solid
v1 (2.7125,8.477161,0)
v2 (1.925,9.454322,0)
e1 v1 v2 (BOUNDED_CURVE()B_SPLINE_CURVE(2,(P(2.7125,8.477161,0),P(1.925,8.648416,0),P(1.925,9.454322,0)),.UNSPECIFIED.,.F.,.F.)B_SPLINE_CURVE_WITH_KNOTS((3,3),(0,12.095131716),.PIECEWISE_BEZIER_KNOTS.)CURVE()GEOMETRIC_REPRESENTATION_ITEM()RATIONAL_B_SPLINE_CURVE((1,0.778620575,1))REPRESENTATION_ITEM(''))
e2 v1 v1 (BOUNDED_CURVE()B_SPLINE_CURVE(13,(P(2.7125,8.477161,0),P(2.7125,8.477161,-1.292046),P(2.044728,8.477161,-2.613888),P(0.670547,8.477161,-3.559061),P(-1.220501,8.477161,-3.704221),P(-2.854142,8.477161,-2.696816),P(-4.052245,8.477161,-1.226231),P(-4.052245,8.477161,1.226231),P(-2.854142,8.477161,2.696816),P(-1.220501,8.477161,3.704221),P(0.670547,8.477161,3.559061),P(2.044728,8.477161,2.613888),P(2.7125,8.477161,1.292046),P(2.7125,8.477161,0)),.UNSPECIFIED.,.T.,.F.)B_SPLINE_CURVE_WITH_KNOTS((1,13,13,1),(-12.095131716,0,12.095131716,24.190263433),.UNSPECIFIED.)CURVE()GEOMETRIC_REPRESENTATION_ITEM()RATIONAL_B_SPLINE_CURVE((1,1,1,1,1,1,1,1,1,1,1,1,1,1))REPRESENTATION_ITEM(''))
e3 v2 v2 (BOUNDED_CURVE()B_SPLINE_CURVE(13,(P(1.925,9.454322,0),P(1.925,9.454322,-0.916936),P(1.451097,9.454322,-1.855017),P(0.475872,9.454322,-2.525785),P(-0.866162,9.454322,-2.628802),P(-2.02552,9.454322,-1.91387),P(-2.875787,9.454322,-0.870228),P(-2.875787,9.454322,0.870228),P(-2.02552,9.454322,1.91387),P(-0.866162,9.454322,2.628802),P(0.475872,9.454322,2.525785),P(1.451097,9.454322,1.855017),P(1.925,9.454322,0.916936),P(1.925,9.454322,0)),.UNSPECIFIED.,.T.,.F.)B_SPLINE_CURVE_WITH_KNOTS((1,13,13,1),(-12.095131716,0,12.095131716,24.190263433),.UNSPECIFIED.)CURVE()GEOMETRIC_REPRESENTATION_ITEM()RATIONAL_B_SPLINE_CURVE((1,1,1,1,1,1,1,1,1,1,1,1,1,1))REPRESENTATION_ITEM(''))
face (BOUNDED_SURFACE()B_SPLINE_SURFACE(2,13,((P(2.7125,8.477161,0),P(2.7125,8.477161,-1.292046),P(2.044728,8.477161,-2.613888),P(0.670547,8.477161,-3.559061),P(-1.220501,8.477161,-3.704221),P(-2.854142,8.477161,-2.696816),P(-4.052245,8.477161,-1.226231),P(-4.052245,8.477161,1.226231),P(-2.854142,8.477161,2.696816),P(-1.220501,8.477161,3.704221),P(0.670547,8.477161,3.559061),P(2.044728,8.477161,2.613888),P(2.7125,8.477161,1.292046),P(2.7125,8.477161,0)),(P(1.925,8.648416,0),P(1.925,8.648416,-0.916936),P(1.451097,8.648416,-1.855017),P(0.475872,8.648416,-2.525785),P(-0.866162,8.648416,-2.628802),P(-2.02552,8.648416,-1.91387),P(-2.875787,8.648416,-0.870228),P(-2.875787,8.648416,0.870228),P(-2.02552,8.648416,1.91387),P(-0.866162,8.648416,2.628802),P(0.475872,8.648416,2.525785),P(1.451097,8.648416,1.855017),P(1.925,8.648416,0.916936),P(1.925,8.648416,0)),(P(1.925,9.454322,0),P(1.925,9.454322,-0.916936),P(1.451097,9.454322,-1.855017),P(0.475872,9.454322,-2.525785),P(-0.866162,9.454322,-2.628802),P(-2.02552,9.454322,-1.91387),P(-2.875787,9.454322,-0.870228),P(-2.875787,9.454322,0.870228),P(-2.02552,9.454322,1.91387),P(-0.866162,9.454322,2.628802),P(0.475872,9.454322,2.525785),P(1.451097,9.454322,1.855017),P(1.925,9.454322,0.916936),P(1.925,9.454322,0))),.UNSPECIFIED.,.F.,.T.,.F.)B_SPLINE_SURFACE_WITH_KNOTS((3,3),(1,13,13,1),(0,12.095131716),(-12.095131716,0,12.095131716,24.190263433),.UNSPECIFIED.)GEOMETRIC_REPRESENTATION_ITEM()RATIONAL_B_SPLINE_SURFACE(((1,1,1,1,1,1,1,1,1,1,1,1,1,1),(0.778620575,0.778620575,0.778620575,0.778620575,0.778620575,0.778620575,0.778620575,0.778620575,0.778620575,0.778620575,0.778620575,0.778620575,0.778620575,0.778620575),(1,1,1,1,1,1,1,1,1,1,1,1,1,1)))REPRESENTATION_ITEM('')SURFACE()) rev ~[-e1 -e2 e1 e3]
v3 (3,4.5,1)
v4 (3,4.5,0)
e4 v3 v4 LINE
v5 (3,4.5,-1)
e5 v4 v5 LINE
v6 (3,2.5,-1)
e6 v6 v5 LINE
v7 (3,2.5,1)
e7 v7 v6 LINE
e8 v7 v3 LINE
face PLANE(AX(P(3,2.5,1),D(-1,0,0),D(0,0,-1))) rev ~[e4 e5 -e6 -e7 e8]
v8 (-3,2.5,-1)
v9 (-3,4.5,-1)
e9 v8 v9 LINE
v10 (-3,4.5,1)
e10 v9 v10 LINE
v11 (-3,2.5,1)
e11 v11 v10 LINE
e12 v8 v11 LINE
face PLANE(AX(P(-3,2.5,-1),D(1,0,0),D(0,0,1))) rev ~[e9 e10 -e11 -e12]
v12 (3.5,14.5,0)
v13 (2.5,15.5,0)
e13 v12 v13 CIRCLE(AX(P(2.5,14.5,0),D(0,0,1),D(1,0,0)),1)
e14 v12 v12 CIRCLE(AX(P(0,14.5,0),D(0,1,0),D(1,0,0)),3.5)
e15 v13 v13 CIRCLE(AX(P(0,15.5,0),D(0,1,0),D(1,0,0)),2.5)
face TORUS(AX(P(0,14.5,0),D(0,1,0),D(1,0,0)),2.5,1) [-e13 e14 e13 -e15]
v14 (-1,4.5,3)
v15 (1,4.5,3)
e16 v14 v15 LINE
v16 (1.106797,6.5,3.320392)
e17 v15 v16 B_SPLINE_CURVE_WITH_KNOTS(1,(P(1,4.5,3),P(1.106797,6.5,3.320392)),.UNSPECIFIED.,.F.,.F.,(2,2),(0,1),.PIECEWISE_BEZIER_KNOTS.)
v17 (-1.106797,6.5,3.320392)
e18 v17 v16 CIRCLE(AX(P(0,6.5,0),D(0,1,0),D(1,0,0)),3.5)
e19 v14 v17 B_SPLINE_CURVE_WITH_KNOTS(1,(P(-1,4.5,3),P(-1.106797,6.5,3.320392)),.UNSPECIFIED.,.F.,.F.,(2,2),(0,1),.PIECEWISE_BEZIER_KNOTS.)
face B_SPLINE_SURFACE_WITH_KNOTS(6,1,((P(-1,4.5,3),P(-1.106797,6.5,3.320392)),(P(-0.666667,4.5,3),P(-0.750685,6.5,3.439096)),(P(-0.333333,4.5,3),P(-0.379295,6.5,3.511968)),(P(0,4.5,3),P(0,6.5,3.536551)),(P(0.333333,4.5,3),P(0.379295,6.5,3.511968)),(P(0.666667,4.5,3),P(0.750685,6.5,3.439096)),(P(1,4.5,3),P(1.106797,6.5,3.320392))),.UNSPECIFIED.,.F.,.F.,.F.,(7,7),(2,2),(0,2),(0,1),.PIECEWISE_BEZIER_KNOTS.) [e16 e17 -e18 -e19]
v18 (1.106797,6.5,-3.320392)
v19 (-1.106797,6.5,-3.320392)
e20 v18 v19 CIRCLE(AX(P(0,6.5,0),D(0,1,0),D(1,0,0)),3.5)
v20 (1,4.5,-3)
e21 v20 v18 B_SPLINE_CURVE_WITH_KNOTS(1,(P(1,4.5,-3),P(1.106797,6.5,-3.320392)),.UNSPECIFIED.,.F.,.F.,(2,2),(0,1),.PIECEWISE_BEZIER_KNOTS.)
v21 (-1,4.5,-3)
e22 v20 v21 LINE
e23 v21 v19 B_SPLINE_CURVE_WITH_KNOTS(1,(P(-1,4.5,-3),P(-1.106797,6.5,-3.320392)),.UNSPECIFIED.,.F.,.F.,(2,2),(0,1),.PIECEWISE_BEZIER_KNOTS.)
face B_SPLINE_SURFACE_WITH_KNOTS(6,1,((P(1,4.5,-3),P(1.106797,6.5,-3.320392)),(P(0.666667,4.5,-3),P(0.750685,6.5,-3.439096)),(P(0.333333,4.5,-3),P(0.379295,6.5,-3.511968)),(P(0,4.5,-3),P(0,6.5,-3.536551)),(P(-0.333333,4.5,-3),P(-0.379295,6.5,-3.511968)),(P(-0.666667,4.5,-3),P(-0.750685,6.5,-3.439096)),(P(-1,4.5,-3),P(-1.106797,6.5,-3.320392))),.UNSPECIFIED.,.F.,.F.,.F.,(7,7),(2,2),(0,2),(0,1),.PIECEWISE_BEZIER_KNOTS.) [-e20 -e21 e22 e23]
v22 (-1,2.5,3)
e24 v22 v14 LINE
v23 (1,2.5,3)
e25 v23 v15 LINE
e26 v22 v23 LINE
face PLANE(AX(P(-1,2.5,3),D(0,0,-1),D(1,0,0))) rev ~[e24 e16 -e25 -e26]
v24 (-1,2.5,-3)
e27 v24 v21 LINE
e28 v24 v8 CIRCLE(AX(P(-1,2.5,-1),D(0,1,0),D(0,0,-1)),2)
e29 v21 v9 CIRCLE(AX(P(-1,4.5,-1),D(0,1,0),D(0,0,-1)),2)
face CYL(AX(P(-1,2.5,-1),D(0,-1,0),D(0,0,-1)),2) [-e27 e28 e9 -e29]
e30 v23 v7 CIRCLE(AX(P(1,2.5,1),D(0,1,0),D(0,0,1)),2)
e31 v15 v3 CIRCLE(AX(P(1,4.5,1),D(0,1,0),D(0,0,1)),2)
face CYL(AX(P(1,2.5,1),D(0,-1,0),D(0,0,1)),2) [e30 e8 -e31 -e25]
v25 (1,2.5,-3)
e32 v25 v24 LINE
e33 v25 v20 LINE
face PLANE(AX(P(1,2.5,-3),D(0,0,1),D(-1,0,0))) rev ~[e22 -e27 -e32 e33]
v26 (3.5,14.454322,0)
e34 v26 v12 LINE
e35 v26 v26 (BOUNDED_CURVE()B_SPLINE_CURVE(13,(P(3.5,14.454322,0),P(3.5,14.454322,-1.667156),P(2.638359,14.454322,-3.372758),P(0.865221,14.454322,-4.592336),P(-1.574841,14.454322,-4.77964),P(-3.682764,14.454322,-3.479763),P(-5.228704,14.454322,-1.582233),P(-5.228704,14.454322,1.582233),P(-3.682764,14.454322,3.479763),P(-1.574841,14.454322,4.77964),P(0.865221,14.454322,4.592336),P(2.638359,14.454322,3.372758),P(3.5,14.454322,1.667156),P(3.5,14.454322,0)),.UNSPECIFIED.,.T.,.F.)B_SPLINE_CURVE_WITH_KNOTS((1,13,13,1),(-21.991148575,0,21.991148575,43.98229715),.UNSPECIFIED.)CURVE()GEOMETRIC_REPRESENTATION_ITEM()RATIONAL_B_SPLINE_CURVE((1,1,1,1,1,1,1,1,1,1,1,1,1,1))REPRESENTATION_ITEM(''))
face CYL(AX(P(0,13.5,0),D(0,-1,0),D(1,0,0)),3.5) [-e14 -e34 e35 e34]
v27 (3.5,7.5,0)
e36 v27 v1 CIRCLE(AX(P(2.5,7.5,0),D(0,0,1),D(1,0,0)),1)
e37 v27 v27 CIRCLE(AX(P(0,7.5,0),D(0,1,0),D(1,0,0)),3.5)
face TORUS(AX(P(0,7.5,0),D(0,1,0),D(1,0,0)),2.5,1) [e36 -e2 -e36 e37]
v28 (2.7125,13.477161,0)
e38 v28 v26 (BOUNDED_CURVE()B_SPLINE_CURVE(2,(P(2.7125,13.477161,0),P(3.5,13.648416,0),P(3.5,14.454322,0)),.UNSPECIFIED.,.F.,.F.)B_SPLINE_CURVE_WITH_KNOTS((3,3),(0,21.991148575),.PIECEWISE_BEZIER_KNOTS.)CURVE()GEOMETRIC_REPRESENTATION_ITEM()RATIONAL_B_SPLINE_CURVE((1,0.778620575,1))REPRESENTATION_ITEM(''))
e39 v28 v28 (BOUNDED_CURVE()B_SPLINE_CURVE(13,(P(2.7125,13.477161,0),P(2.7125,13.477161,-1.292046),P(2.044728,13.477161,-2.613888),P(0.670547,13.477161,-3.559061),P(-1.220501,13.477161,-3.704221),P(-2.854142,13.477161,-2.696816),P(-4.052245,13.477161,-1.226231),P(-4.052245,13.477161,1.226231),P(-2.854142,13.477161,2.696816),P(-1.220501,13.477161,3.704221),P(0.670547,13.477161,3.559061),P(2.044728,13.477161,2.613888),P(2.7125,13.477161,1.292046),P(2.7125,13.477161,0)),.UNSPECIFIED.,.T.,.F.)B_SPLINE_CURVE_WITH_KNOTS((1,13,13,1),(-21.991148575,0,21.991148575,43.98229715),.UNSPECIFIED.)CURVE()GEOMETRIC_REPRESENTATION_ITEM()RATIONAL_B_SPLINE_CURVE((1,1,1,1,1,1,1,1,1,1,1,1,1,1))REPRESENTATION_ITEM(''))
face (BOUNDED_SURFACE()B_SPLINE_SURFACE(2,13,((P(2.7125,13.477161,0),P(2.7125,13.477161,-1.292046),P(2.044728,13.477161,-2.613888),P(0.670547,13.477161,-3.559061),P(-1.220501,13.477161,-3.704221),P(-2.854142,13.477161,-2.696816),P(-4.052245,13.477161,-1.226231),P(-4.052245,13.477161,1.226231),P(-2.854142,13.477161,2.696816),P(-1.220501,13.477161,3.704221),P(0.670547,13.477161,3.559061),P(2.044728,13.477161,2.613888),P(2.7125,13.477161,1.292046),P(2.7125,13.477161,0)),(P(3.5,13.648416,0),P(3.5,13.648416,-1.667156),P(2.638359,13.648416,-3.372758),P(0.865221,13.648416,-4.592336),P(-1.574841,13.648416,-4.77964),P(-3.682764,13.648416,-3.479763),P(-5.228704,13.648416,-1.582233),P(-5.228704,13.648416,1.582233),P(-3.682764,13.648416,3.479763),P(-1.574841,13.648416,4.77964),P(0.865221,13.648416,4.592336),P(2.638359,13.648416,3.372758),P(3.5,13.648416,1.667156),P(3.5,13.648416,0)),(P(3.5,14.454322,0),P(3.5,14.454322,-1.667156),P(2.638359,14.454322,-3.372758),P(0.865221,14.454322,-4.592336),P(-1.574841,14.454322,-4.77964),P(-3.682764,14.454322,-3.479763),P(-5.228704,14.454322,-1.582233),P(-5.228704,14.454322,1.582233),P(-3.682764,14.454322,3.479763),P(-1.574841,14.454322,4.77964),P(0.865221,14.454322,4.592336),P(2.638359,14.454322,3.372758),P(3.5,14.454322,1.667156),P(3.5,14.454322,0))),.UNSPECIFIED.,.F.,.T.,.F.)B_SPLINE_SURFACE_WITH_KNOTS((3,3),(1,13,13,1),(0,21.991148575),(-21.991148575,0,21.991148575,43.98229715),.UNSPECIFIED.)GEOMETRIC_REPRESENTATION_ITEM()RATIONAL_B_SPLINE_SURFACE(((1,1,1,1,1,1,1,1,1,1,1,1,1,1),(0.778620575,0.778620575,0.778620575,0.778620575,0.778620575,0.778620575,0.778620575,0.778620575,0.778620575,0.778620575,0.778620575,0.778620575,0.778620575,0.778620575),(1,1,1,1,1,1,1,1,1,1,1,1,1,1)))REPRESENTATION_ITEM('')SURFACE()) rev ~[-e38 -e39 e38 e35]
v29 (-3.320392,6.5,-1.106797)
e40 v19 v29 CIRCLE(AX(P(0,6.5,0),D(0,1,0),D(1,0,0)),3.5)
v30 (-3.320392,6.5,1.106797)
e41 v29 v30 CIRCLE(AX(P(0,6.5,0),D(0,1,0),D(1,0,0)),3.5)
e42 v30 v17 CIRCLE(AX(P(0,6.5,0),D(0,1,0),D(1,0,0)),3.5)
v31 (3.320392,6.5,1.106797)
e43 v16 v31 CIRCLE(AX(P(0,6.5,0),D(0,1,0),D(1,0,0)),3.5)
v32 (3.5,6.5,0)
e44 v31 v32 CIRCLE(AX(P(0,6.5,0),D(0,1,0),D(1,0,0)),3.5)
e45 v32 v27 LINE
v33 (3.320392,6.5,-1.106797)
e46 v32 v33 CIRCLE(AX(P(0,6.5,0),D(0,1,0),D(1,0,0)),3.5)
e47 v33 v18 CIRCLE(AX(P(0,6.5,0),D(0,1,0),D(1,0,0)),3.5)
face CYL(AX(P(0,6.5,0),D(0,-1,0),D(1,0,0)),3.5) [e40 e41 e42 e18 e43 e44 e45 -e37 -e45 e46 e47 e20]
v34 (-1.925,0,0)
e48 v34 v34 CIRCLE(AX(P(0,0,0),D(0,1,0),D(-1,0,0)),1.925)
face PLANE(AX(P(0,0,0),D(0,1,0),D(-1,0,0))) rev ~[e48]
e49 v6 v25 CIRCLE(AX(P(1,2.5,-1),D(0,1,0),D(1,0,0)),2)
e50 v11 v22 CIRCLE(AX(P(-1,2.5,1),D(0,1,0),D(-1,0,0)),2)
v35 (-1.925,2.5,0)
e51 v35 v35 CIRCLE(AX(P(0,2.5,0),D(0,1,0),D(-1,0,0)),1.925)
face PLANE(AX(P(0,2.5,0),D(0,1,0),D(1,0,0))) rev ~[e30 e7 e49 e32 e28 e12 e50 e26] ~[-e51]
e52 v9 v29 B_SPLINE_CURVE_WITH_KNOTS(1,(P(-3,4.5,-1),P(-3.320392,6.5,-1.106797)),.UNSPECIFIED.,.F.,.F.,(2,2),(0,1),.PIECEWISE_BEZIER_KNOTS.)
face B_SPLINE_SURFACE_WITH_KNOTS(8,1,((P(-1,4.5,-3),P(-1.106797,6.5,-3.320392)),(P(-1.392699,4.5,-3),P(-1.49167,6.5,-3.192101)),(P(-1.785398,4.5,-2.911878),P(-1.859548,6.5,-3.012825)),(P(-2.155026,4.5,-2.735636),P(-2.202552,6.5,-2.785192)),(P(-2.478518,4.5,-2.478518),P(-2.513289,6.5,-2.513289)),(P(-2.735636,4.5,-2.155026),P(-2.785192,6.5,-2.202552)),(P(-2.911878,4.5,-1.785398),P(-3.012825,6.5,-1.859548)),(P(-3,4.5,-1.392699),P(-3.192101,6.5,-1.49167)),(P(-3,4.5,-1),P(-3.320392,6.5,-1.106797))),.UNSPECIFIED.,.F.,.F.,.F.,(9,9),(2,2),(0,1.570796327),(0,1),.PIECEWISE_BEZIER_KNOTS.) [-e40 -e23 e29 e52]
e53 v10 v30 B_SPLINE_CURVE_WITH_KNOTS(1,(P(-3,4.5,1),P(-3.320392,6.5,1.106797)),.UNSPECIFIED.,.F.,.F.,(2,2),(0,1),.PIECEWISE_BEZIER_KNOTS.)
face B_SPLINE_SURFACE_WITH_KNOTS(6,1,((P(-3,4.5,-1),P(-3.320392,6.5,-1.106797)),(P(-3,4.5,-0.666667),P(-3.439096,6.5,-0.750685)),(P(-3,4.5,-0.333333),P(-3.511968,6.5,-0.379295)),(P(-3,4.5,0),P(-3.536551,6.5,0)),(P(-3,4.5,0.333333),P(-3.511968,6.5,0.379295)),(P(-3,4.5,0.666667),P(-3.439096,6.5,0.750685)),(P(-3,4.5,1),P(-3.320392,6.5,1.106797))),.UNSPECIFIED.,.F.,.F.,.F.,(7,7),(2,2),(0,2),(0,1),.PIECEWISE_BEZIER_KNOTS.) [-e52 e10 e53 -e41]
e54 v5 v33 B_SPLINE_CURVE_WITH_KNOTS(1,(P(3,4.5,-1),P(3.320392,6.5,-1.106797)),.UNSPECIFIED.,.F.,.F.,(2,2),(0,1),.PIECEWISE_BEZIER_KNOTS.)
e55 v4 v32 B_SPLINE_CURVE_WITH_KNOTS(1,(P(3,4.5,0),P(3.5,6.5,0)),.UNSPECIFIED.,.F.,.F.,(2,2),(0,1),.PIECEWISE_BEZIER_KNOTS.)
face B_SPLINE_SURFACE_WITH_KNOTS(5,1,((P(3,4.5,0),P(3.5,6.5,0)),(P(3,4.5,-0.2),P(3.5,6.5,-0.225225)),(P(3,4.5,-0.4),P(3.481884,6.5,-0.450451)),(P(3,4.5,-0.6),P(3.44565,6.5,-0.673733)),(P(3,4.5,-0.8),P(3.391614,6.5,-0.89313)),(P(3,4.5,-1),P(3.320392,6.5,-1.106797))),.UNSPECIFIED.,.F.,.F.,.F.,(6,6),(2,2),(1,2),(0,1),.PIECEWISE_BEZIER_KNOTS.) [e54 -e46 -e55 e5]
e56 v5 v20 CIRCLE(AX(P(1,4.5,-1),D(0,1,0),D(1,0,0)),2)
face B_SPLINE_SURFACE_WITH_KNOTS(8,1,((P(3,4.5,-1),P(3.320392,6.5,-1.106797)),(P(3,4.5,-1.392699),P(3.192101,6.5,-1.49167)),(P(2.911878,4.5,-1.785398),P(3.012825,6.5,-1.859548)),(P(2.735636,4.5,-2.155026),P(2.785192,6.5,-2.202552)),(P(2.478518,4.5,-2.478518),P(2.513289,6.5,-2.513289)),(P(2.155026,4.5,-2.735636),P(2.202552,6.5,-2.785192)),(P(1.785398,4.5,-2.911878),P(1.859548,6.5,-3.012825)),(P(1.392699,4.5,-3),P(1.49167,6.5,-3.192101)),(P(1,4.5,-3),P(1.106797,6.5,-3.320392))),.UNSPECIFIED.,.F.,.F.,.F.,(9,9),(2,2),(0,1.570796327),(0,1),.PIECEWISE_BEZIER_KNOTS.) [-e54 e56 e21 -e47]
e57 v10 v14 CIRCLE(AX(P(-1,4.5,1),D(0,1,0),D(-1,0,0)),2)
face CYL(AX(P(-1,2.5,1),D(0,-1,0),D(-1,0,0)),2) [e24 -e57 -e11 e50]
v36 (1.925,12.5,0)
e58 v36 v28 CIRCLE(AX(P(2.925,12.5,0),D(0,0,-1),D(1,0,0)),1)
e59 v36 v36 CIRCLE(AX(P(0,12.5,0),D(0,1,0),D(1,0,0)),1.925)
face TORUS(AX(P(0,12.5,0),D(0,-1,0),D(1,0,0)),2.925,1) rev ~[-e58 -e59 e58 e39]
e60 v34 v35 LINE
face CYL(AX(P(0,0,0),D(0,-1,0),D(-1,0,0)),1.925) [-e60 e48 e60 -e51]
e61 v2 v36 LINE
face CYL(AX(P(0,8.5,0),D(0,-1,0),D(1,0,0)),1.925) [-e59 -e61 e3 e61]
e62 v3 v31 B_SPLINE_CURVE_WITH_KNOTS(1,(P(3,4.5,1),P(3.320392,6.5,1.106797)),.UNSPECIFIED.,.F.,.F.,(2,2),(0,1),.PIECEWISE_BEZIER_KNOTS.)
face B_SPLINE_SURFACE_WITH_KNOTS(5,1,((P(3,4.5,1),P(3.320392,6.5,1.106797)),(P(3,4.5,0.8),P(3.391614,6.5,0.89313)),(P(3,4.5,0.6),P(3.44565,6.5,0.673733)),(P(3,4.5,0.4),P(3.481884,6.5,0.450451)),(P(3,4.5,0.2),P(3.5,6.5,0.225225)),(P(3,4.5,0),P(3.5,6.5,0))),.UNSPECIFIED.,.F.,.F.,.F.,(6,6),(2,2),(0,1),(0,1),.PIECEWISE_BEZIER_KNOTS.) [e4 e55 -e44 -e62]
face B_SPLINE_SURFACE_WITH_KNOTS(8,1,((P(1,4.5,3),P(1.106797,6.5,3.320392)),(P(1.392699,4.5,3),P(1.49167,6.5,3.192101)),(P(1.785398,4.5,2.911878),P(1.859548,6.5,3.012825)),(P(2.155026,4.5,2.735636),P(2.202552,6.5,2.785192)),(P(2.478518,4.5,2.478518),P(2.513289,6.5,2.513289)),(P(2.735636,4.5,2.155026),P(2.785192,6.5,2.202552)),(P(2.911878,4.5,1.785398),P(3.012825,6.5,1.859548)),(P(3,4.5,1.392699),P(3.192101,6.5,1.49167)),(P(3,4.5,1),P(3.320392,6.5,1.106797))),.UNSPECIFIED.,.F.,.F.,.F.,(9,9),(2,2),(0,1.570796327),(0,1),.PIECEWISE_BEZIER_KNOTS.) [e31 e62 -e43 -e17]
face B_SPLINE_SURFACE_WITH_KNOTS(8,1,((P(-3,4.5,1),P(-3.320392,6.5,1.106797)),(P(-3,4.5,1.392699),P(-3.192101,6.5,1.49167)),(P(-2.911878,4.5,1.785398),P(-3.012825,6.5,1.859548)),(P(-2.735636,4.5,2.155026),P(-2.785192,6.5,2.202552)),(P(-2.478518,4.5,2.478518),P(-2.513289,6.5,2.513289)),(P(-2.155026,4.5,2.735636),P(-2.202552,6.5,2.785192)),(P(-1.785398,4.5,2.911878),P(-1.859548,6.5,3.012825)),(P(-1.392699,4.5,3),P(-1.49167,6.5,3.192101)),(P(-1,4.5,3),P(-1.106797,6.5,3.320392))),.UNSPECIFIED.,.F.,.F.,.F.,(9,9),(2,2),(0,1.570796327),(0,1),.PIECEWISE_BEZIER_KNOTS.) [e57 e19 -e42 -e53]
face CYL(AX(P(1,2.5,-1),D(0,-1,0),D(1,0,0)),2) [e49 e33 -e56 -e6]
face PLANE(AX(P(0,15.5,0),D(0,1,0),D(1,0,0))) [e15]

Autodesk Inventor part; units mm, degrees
ref_plane "YZ Plane" through (0, 0, 0) normal (1, 0, 0) x (0, 1, 0)
ref_plane "XZ Plane" through (0, 0, 0) normal (0, 1, 0) x (-1, 0, 0)
ref_plane "XY Plane" through (0, 0, 0) normal (0, 0, 1) x (1, 0, 0)
sketch "Sketch1" plane through (0, 0, 0) normal (0, 1, 0) x (-1, 0, 0)
  circle A0 centre (0, 0) radius 1.925
  dimension "d0" = 3.85
extrude "Extrusion1" add sketch "Sketch1" along normal blind 2.5
sketch "Sketch2" plane through (0, 2.5, 0) normal (0, 1, 0) x (1, 0, 0)
  line L0 (-1, -3) -> (1, -3)
  line L1 (3, -1) -> (3, 1)
  line L2 (1, 3) -> (-1, 3)
  line L3 (-3, 1) -> (-3, -1)
  line L4 (-3, -3) -> (3, 3) construction
  line L5 (3, -3) -> (-3, 3) construction
  arc A0 (-3, -1) -> (-1, -3) centre (-1, -1) ccw
  arc A1 (-1, 3) -> (-3, 1) centre (-1, 1) ccw
  arc A2 (3, 1) -> (1, 3) centre (1, 1) ccw
  arc A3 (1, -3) -> (3, -1) centre (1, -1) ccw
  point P0 (0, 0)
  dimension "d3" = 6
  dimension "d4" = 6
  dimension "d5" = 2
extrude "Extrusion2" add sketch "Sketch2" along normal blind 2
sketch "Sketch3" plane through (0, 4.5, 0) normal (0, 1, 0) x (1, 0, 0)
  circle A0 centre (0, 0) radius 1.925 projected
extrude "Extrusion3" add sketch "Sketch3" along normal blind 2
sketch "Sketch5" plane through (0, 6.5, 0) normal (0, 1, 0) x (1, 0, 0)
  circle A0 centre (0, 0) radius 3.5
  dimension "d14" = 7
extrude "Extrusion5" add sketch "Sketch5" along normal blind 2
sketch "Sketch6" plane through (0, 8.5, 0) normal (0, 1, 0) x (1, 0, 0)
  circle A0 centre (0, 0) radius 1.925 projected
extrude "Extrusion6" add sketch "Sketch6" along normal blind 5
sketch "Sketch7" plane through (0, 13.5, 0) normal (0, 1, 0) x (1, 0, 0)
  circle A0 centre (0, 0) radius 3.5 projected
extrude "Extrusion7" add sketch "Sketch7" along normal blind 2
sketch "Sketch8" plane through (0, 4.5, 0) normal (0, 1, 0) x (1, 0, 0)
  circle A0 centre (0, 0) radius 1.925 projected
  arc A1 (1, -3) -> (3, -1) centre (1, -1) ccw projected
  line L0 (3, -1) -> (3, 1) projected
  arc A2 (3, 1) -> (1, 3) centre (1, 1) ccw projected
  line L1 (1, 3) -> (-1, 3) projected
  arc A3 (-1, 3) -> (-3, 1) centre (-1, 1) ccw projected
  line L2 (-3, 1) -> (-3, -1) projected
  arc A4 (-3, -1) -> (-1, -3) centre (-1, -1) ccw projected
  line L3 (-1, -3) -> (1, -3) projected
loft "Loft1" add section 1 edges at (2.4142, 4.5, 2.4142) (3, 4.5, 0) (2.4142, 4.5, -2.4142) (0, 4.5, -3) (-2.4142, 4.5, -2.4142) (-3, 4.5, 0) (-2.4142, 4.5, 2.4142) (0, 4.5, 3) section 2 edges at (-3.5, 6.5, 0)
fillet "Fillet3" radius 1 5 edges at (-3.5, 8.5, 0) (-1.925, 8.5, 0) (-1.925, 13.5, 0) (-3.5, 13.5, 0) (-3.5, 15.5, 0)
properties part number "guia"
